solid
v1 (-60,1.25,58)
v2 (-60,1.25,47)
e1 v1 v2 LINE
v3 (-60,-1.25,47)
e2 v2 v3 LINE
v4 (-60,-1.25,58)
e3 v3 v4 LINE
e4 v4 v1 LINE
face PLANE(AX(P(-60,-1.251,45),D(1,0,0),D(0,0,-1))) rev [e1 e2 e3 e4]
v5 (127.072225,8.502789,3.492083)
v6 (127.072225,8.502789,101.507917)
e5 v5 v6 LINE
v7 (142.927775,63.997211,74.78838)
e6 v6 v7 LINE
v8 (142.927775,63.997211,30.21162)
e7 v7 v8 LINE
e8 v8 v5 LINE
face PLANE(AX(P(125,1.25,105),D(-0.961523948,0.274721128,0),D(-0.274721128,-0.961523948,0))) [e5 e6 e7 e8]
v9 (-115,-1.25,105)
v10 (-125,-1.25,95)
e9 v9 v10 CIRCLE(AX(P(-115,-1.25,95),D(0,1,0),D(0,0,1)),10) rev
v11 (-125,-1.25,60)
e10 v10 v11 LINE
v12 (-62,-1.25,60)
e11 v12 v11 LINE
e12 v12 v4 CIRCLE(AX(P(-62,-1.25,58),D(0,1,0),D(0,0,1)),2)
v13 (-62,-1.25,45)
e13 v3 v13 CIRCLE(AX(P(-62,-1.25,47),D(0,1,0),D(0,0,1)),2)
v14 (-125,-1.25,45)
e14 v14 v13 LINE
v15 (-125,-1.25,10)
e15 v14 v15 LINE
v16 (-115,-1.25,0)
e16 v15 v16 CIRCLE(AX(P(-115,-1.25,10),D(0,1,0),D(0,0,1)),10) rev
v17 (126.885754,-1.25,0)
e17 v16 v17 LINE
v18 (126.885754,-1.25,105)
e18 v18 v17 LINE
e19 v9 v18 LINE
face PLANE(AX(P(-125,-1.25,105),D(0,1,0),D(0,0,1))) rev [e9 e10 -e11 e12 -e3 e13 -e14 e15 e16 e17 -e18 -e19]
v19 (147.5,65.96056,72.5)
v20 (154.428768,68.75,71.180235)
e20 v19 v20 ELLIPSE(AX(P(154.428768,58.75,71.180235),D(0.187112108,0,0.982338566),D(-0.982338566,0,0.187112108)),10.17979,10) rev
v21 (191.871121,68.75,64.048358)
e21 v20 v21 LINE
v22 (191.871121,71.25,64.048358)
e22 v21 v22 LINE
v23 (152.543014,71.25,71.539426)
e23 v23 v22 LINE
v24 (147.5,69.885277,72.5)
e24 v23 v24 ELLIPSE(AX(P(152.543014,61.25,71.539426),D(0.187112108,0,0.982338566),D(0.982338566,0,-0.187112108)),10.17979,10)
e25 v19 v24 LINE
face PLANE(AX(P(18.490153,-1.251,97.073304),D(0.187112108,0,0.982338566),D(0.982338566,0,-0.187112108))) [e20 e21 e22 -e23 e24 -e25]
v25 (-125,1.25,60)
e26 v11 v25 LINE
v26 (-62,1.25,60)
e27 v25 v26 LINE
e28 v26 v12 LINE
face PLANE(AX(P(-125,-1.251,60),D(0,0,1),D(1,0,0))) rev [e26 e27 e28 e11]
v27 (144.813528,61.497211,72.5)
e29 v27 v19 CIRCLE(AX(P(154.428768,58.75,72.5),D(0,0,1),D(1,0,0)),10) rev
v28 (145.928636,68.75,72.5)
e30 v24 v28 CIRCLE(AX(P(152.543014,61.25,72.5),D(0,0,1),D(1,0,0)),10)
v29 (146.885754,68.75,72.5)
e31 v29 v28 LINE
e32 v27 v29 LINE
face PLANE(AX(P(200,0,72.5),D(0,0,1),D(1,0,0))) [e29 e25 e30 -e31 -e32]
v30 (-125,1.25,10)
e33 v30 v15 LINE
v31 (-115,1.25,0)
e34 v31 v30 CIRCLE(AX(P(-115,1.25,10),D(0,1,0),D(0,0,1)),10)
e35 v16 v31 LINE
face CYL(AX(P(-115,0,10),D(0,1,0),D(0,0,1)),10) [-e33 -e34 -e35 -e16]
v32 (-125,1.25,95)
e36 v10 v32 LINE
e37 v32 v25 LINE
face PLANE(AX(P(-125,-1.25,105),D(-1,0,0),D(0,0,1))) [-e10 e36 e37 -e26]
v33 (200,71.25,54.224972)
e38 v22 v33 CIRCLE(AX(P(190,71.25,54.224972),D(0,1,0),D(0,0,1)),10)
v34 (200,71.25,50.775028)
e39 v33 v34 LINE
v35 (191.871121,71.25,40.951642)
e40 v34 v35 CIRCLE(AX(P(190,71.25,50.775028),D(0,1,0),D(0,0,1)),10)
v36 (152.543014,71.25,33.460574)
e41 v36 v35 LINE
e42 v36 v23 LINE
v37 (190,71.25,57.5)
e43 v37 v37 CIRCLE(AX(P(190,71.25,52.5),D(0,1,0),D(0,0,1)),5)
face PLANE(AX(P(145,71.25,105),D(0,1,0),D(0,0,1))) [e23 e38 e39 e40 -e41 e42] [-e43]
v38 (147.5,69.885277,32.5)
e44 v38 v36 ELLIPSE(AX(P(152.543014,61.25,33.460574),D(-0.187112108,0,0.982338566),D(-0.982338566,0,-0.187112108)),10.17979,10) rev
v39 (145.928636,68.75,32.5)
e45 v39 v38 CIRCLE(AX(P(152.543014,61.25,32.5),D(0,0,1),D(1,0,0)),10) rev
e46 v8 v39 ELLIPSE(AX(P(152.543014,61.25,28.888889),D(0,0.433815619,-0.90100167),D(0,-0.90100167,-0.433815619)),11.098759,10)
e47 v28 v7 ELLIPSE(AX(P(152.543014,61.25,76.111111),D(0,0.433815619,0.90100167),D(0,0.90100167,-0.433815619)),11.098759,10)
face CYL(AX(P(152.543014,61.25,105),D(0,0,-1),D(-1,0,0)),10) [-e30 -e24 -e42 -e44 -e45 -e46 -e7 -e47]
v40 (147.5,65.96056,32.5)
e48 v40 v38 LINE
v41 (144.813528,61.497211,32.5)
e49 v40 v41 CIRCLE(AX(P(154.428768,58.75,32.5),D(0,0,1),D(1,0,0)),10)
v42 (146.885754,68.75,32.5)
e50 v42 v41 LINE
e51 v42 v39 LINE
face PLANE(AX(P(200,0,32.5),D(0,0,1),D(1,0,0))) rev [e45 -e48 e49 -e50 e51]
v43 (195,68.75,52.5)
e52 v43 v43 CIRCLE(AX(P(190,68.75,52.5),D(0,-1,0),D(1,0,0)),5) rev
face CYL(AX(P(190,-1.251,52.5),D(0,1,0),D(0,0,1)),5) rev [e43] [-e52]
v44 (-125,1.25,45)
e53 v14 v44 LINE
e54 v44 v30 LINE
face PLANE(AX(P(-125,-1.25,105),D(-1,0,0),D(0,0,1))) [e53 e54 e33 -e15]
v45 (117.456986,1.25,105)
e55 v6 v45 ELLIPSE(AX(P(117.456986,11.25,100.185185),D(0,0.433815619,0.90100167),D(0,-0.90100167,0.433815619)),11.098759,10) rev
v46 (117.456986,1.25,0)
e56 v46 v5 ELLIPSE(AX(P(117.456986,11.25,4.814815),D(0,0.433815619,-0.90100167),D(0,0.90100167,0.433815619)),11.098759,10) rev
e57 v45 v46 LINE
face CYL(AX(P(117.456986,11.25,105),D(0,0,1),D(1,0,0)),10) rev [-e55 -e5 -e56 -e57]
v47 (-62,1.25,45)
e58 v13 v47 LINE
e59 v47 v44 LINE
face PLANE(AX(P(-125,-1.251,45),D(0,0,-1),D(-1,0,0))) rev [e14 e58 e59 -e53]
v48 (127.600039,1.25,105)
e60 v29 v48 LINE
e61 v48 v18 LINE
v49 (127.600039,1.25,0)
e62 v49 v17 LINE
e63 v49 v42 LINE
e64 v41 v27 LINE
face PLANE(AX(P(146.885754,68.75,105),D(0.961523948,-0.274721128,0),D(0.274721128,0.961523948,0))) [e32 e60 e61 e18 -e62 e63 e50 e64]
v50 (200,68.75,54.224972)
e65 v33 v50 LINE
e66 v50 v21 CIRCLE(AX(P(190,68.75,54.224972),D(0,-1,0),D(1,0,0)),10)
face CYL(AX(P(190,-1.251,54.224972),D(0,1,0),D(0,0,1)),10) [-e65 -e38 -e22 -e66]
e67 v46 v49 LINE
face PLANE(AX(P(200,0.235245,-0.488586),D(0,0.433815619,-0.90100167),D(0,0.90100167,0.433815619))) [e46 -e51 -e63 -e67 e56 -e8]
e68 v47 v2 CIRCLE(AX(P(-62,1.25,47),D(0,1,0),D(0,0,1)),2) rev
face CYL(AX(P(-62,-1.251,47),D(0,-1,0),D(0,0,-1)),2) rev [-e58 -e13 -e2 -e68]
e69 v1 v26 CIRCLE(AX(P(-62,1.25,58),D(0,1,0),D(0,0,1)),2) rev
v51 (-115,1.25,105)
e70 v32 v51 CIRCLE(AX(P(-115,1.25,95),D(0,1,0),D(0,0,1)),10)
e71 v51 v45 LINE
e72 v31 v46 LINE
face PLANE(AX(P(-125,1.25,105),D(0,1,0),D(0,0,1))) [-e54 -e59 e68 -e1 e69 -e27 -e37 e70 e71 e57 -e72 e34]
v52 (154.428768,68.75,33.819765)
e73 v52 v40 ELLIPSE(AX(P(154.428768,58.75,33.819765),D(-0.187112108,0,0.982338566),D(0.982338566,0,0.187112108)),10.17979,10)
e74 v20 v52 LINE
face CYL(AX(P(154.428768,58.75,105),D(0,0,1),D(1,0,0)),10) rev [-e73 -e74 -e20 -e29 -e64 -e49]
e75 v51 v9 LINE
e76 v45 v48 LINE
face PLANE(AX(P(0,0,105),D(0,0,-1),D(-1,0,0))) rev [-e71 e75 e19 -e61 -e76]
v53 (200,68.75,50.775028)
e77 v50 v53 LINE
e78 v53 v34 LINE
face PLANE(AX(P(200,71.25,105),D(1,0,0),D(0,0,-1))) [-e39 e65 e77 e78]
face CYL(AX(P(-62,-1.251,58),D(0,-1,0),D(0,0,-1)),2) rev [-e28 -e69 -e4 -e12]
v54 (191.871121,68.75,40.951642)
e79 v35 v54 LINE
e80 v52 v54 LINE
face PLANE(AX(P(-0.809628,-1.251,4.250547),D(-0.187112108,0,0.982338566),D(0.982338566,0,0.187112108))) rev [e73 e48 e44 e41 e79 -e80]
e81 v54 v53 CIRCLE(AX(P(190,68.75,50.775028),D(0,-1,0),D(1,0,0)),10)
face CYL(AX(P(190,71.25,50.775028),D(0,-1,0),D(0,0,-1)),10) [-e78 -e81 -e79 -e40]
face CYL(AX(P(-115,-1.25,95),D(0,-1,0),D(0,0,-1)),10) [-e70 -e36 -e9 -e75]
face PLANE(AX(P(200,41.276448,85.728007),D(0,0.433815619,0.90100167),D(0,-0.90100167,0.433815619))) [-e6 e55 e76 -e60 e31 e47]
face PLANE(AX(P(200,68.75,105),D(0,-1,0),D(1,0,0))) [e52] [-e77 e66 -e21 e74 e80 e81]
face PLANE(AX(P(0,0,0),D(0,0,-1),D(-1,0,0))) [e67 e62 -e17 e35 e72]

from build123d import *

# Parameters (mm, degrees)
BOSS_EXTRUDE1_DEPTH = 105
CUT_EXTRUDE1_REACH  = 238.485
SKETCH2_W           = 65
SKETCH2_H           = 15
CUT_EXTRUDE12_DEPTH = 281.35970199
CUT_EXTRUDE14_REACH = 239.237
FILLET1_R           = 10
FILLET2_R           = 10
FILLET3_R           = 10
FILLET4_R           = 2
CUT_EXTRUDE15_REACH = 239.237
SKETCH13_R          = 5
FILLET5_R           = 10


with BuildPart() as part:
    # Sketch1 → Boss-Extrude1 (new body)
    with BuildSketch(Plane.XY):
        Polygon((-125, -1.25), (125, -1.25), (126.885753532, -1.25), (146.885753532, 68.75), (200, 68.75), (200, 71.25), (145, 71.25), (125, 1.25), (-125, 1.25), align=None)
    extrude(amount=BOSS_EXTRUDE1_DEPTH)

    # Sketch2 → Cut-Extrude1 (cut, up to next)
    with BuildSketch(Plane(origin=(0, 1.25, 0), x_dir=(1, 0, 0), z_dir=(0, 1, 0)), mode=Mode.PRIVATE) as cut_extrude1_sk1:
        with Locations((-92.5, -52.5)):
            Rectangle(SKETCH2_W, SKETCH2_H)
    cut_extrude1_tool1 = extrude(cut_extrude1_sk1.sketch, amount=-CUT_EXTRUDE1_REACH, mode=Mode.PRIVATE) & part.part
    add(cut_extrude1_tool1.solids().sort_by_distance((-92.5, 1.25, 52.5))[0], mode=Mode.SUBTRACT)

    # Sketch11 → Cut-Extrude12 (cut, through all)
    with BuildSketch(Plane(origin=(125, 0, 0), x_dir=(0, 0, -1), z_dir=(1, 0, 0))):
        Polygon((0, 71.25), (0, 1.25), (-32.5, 68.75), (-32.5, 71.25), align=None)
        Polygon((-72.5, 68.75), (-72.5, 71.25), (-105, 71.25), (-105, 1.25), align=None)
    extrude(amount=CUT_EXTRUDE12_DEPTH, mode=Mode.SUBTRACT)

    # Sketch12 → Cut-Extrude14 (cut, up to next)
    with BuildSketch(Plane(origin=(0, 71.25, 0), x_dir=(1, 0, 0), z_dir=(0, 1, 0)), mode=Mode.PRIVATE) as cut_extrude14_sk1:
        Polygon((200, -62.5), (147.5, -72.5), (200, -72.5), align=None)
    cut_extrude14_tool1 = extrude(cut_extrude14_sk1.sketch, amount=-CUT_EXTRUDE14_REACH, mode=Mode.PRIVATE) & part.part
    # Sketch12 → Cut-Extrude14 (cut, up to next)
    with BuildSketch(Plane(origin=(0, 71.25, 0), x_dir=(1, 0, 0), z_dir=(0, 1, 0)), mode=Mode.PRIVATE) as cut_extrude14_sk2:
        Polygon((200, -32.5), (147.5, -32.5), (200, -42.5), align=None)
    cut_extrude14_tool2 = extrude(cut_extrude14_sk2.sketch, amount=-CUT_EXTRUDE14_REACH, mode=Mode.PRIVATE) & part.part
    add(cut_extrude14_tool1.solids().sort_by_distance((182.5, 71.25, 69.166667))[0], mode=Mode.SUBTRACT)
    add(cut_extrude14_tool2.solids().sort_by_distance((182.5, 71.25, 35.833333))[0], mode=Mode.SUBTRACT)

    # Fillet1
    fillet1_edges = [part.edges().sort_by_distance(p)[0] for p in [
        (200, 70, 42.5),
        (200, 70, 62.5),
    ]]
    fillet(fillet1_edges, radius=FILLET1_R)

    # Fillet2
    # the kernel refuses this fillet: 10 mm, written as the material it adds along each edge
    with BuildSketch(Plane(origin=(146.885753532, 68.75, 32.5), x_dir=(1, 0, 0), z_dir=(0, 0, 1))) as fillet2_piece_1_section:
        with BuildLine():
            CenterArc((FILLET2_R * 0.754301412754, -FILLET2_R), FILLET2_R, 90, 74.054604099)
            Line((-FILLET2_R * 0.207222534886, -FILLET2_R * 0.725278872103), (0, 0))
            Line((0, 0), (FILLET2_R * 0.754301412754, 0))
        make_face()
    fillet2_piece_1 = extrude(amount=40, mode=Mode.PRIVATE)
    fillet2_piece_1 = split(fillet2_piece_1, bisect_by=Plane(origin=(151.701250416, 67.179105295, 33.300238174), z_dir=(-0.18711210788999527, 0, 0.9823385664224747)), keep=Keep.TOP, mode=Mode.PRIVATE)
    fillet2_piece_1 = split(fillet2_piece_1, bisect_by=Plane(origin=(151.701250416, 67.179105295, 71.699761826), z_dir=(-0.18711210788999538, 0, -0.9823385664224747)), keep=Keep.TOP, mode=Mode.PRIVATE)
    add(fillet2_piece_1)
    # the kernel refuses this fillet: 10 mm, written as the material it takes off along each edge
    with BuildSketch(Plane(origin=(145, 71.25, 13.642464681), x_dir=(-0.27472112789737757, -0.9615239476408233, 0), z_dir=(0, 0, 1))) as fillet2_2_piece_1:
        with BuildLine():
            CenterArc((FILLET2_R * 0.754301412754, FILLET2_R), FILLET2_R, 195.945395901, 74.054604099)
            Line((-FILLET2_R * 0.207222534886, FILLET2_R * 0.725278872103), (0, 0))
            Line((0, 0), (FILLET2_R * 0.754301412754, 0))
        make_face()
    extrude(amount=77.715070638, mode=Mode.SUBTRACT)

    # Fillet3
    fillet3_edges = [part.edges().sort_by_distance(p)[0] for p in [
        (125, 1.25, 52.5),
    ]]
    fillet(fillet3_edges, radius=FILLET3_R)

    # Fillet4
    fillet4_edges = [part.edges().sort_by_distance(p)[0] for p in [
        (-60, 0, 45),
        (-60, 0, 60),
    ]]
    fillet(fillet4_edges, radius=FILLET4_R)

    # Sketch13 → Cut-Extrude15 (cut, up to next)
    with BuildSketch(Plane(origin=(0, 71.25, 0), x_dir=(1, 0, 0), z_dir=(0, 1, 0)), mode=Mode.PRIVATE) as cut_extrude15_sk1:
        with Locations(Location((190, -52.5, 0), (0, 0, 270))):
            Circle(SKETCH13_R)
    cut_extrude15_tool1 = extrude(cut_extrude15_sk1.sketch, amount=-CUT_EXTRUDE15_REACH, mode=Mode.PRIVATE) & part.part
    add(cut_extrude15_tool1.solids().sort_by_distance((190, 71.25, 52.5))[0], mode=Mode.SUBTRACT)

    # Fillet5
    fillet5_edges = [part.edges().sort_by_distance(p)[0] for p in [
        (-125, 0, 0),
        (-125, 0, 105),
    ]]
    fillet(fillet5_edges, radius=FILLET5_R)


solid = part.part
